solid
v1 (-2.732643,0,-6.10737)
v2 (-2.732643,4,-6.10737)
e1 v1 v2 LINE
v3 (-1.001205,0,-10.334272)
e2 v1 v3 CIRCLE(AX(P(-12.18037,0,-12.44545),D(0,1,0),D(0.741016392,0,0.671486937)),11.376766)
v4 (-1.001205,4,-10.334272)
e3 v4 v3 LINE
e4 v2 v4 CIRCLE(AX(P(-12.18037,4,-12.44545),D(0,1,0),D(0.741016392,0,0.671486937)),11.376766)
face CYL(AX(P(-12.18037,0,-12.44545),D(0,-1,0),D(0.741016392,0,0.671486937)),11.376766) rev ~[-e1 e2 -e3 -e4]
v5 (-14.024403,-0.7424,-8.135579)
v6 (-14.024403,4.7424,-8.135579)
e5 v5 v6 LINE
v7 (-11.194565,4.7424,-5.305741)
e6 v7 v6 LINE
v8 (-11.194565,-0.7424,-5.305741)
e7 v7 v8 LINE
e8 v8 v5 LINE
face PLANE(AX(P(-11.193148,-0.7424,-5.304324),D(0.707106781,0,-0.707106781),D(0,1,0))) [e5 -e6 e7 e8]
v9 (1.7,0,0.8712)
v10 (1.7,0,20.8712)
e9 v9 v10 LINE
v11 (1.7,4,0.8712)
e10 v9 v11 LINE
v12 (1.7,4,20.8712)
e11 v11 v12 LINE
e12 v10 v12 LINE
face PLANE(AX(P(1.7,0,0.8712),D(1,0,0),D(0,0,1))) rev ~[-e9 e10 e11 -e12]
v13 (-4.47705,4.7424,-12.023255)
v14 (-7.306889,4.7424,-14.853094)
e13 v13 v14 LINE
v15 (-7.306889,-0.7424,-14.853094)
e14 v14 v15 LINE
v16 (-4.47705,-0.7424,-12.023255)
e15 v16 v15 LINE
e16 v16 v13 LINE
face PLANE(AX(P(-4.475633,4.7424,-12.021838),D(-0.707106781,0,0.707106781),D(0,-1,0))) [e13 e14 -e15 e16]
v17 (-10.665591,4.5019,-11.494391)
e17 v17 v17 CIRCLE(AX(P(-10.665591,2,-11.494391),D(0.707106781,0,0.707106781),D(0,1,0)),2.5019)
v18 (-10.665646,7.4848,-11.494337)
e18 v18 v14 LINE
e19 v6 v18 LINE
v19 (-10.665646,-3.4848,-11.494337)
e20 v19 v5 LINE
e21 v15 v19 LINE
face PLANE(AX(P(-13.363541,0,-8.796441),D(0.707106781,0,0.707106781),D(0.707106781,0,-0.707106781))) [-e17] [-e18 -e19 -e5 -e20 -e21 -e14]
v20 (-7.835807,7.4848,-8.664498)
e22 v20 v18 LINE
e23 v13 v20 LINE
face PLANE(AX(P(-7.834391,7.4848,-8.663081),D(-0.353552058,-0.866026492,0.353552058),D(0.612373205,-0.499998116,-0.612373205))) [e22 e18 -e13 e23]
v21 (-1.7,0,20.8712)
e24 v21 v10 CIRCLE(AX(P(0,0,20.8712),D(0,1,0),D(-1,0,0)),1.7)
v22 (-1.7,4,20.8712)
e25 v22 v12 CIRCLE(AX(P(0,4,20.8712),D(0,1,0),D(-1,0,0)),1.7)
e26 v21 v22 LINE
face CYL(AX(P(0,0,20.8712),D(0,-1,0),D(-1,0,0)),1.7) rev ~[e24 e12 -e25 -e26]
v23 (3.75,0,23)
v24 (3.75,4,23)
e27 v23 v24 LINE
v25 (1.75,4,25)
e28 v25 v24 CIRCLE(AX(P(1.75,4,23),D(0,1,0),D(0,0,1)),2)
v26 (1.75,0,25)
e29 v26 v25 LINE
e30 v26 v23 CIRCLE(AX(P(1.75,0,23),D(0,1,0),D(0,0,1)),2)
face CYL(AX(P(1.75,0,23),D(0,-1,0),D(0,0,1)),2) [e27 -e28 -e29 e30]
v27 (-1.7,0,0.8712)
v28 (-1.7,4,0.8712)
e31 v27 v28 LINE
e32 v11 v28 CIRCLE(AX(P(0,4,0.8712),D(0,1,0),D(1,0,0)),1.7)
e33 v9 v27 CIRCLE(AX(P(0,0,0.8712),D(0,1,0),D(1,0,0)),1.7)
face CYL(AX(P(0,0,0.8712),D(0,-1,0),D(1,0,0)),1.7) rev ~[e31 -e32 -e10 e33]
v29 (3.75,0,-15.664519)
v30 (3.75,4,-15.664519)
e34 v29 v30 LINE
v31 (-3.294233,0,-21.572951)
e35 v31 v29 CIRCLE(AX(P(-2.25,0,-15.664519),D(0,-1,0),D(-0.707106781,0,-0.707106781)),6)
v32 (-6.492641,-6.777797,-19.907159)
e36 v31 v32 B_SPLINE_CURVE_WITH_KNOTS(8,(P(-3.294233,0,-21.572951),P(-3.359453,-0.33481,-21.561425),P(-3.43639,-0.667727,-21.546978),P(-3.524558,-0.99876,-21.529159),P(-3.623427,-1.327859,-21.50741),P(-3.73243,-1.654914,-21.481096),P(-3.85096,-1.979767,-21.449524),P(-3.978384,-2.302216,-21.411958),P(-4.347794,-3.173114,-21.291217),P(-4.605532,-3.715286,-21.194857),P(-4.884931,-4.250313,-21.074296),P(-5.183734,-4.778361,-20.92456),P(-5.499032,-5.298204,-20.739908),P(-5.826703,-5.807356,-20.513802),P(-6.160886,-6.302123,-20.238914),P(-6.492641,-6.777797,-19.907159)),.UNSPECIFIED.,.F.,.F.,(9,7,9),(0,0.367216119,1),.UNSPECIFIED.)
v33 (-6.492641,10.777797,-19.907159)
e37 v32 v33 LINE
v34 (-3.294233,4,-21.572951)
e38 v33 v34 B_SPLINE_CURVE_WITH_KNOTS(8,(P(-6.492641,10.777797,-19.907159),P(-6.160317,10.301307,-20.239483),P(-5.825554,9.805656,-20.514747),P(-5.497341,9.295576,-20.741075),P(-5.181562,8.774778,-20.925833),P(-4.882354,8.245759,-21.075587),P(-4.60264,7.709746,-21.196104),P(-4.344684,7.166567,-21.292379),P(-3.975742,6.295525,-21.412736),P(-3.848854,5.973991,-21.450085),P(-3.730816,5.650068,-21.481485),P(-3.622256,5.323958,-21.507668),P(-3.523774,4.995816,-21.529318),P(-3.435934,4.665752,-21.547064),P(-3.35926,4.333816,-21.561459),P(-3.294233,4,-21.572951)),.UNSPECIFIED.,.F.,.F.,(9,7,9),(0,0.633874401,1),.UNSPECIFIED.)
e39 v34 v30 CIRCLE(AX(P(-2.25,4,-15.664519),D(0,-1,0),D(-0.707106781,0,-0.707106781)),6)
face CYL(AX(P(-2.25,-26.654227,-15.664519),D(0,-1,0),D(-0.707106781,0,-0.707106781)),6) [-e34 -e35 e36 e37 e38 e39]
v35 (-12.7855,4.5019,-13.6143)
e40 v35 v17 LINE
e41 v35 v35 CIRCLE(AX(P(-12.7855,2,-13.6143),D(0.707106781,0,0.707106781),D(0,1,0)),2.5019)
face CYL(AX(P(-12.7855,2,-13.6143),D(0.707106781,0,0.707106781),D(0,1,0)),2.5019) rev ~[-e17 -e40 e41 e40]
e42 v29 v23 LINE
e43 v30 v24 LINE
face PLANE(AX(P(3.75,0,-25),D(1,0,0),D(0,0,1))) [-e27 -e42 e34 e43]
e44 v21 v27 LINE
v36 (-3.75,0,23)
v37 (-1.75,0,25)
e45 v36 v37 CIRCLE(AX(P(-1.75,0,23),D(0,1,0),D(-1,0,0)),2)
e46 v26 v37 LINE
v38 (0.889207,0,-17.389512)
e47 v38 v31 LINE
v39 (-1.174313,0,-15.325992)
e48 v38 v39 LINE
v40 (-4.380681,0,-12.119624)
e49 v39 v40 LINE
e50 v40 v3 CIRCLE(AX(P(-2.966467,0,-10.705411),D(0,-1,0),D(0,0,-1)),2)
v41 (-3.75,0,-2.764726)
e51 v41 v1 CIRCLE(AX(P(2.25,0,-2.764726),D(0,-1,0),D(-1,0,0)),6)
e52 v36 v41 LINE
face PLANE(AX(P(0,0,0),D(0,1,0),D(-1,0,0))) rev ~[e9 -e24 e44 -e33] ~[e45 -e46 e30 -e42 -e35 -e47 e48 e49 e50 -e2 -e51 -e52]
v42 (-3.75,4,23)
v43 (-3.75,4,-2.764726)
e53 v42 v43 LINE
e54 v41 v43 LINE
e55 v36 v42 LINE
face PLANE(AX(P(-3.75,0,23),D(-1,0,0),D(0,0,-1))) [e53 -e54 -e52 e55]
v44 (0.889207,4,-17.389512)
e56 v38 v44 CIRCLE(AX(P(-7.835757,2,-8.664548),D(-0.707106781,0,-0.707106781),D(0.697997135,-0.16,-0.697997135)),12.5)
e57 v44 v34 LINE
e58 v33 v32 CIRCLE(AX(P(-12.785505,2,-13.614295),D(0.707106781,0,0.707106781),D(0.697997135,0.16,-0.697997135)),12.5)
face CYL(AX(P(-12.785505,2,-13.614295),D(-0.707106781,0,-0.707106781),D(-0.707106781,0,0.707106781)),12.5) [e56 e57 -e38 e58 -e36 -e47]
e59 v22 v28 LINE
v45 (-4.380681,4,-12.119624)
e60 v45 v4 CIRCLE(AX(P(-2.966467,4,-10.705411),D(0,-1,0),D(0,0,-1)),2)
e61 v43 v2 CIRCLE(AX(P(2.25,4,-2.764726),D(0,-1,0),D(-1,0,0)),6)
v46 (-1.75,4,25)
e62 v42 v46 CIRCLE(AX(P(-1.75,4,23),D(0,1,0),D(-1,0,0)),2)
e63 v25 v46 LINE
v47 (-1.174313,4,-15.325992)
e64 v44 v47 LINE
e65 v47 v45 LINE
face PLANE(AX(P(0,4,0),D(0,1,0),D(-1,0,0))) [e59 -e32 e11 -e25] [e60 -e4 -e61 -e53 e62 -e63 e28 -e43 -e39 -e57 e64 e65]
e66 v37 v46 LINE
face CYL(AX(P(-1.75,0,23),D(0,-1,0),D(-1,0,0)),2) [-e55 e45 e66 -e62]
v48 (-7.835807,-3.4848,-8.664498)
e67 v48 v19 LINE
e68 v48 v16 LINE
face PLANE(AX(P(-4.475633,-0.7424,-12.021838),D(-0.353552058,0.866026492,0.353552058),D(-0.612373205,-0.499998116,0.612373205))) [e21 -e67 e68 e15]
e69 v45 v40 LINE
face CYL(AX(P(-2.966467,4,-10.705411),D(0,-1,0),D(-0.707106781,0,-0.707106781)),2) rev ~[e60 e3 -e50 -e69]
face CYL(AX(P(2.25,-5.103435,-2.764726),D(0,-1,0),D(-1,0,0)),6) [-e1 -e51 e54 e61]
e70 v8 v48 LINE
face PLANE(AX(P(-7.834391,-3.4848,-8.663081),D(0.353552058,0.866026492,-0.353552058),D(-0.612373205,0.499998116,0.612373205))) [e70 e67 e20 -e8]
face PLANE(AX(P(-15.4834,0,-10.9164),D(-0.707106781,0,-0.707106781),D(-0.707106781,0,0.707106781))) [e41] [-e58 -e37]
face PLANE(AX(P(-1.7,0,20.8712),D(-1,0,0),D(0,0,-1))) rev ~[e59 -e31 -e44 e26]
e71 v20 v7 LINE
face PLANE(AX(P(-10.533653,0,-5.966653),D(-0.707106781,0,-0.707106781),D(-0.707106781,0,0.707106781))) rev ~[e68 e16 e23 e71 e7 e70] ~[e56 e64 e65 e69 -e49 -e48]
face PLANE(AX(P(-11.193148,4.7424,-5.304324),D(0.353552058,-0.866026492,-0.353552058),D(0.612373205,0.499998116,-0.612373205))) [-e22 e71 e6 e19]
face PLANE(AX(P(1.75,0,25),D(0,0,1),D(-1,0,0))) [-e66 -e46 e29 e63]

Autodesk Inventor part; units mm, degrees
ref_plane "YZ Plane" through (0, 0, 0) normal (1, 0, 0) x (0, 1, 0)
ref_plane "XZ Plane" through (0, 0, 0) normal (0, 1, 0) x (-1, 0, 0)
ref_plane "XY Plane" through (0, 0, 0) normal (0, 0, 1) x (1, 0, 0)
sketch "Sketch1" plane through (0, 0, 0) normal (0, 1, 0) x (-1, 0, 0)
  line L0 (-3.75, -25) -> (-3.75, 23)
  line L1 (-1.75, 25) -> (1.75, 25)
  line L2 (3.75, 23) -> (3.75, -25)
  line L3 (3.75, -25) -> (-3.75, -25)
  line L4 (-3.75, -25) -> (3.75, 25) construction
  line L5 (-3.75, 25) -> (3.75, -25) construction
  line L6 (0, 0.8712) -> (0, 20.8712) construction
  line L7 (-1.7, 0.8712) -> (-1.7, 20.8712)
  line L8 (1.7, 20.8712) -> (1.7, 0.8712)
  arc A0 (-1.7, 0.8712) -> (1.7, 0.8712) centre (0, 0.8712) ccw
  arc A1 (1.7, 20.8712) -> (-1.7, 20.8712) centre (0, 20.8712) ccw
  arc A2 (3.75, 23) -> (1.75, 25) centre (1.75, 23) ccw
  arc A3 (-1.75, 25) -> (-3.75, 23) centre (-1.75, 23) ccw
  line L9 (-3.75, -25) -> (12.9085, -8.3415)
  line L10 (12.9085, -8.3415) -> (15.4834, -10.9164)
  line L11 (15.4834, -10.9164) -> (-1.1751, -27.5749)
  line L12 (-1.1751, -27.5749) -> (-3.75, -25)
  arc A4 (3.75, -4.8061) -> (3.75, -20.0848) centre (12.1805, -12.4455) ccw
  point P0 (0, 0)
  point P1 (0, 10.8712)
  point P2 (1.3998, -25)
  point P3 (3.75, -17.5)
  point P4 (2.627, -18.623)
  dimension "d0" = 7.5
  dimension "d1" = 50
  dimension "d2" = 20
  dimension "d3" = 1.7
  dimension "d4" = 2
  dimension "d8" = 45
extrude "Main Arm" add sketch "Sketch1" along normal blind 4 contours L9 A4 L2 L11 L3 | L0 A3 L1 A2 L2 A4 L9 | L9 L2 A4 | L2 L9 L10 L11 picked at (3.6165, -19.0676)
sketch "Pad holder" plane through (-15.4834, 0, -10.9164) normal (-0.7071068, 0, -0.7071068) x (-0.7071068, 0, 0.7071068)
  line L0 (-3.8154, 0) -> (-3.8154, 4) projected
  circle A0 centre (-3.8154, 2) radius 12.5
  point P0 (-3.2294, 0)
  dimension "d9" = 25
extrude "pad area" add sketch "Pad holder" against normal blind 7
hole "Hole1" at (-12.7855, 2, -13.6143) direction (0.7071068, 0, 0.7071068) diameter 5.0038 depth 7
sketch "Screw position" plane through (-10.5337, 0, -5.9666) normal (0.7071068, 0, 0.7071068) x (0.7071068, 0, -0.7071068)
  line L0 (3.8154, 0) -> (3.8154, 4) projected
  line L1 (3.8154, 7.4848) -> (8.5654, 4.7424)
  line L2 (8.5654, 4.7424) -> (8.5654, -0.7424)
  line L3 (8.5654, -0.7424) -> (3.8154, -3.4848)
  line L4 (3.8154, -3.4848) -> (-0.9346, -0.7424)
  line L5 (-0.9346, -0.7424) -> (-0.9346, 4.7424)
  line L6 (-0.9346, 4.7424) -> (3.8154, 7.4848)
  point P0 (3.2294, 0)
  point P1 (3.8154, 2)
  dimension "d21" = 9.5
extrude "Extrusion3" cut sketch "Screw position" against normal blind 4
fillet "Fillet1" radius 6 3 edges at (-1.3998, 2, -25) (3.75, 2, -25) (-3.75, 2, -4.8061)
fillet "Fillet2" radius 2 1 edges at (-1.1744, 2, -15.326)
properties part number "arm"
